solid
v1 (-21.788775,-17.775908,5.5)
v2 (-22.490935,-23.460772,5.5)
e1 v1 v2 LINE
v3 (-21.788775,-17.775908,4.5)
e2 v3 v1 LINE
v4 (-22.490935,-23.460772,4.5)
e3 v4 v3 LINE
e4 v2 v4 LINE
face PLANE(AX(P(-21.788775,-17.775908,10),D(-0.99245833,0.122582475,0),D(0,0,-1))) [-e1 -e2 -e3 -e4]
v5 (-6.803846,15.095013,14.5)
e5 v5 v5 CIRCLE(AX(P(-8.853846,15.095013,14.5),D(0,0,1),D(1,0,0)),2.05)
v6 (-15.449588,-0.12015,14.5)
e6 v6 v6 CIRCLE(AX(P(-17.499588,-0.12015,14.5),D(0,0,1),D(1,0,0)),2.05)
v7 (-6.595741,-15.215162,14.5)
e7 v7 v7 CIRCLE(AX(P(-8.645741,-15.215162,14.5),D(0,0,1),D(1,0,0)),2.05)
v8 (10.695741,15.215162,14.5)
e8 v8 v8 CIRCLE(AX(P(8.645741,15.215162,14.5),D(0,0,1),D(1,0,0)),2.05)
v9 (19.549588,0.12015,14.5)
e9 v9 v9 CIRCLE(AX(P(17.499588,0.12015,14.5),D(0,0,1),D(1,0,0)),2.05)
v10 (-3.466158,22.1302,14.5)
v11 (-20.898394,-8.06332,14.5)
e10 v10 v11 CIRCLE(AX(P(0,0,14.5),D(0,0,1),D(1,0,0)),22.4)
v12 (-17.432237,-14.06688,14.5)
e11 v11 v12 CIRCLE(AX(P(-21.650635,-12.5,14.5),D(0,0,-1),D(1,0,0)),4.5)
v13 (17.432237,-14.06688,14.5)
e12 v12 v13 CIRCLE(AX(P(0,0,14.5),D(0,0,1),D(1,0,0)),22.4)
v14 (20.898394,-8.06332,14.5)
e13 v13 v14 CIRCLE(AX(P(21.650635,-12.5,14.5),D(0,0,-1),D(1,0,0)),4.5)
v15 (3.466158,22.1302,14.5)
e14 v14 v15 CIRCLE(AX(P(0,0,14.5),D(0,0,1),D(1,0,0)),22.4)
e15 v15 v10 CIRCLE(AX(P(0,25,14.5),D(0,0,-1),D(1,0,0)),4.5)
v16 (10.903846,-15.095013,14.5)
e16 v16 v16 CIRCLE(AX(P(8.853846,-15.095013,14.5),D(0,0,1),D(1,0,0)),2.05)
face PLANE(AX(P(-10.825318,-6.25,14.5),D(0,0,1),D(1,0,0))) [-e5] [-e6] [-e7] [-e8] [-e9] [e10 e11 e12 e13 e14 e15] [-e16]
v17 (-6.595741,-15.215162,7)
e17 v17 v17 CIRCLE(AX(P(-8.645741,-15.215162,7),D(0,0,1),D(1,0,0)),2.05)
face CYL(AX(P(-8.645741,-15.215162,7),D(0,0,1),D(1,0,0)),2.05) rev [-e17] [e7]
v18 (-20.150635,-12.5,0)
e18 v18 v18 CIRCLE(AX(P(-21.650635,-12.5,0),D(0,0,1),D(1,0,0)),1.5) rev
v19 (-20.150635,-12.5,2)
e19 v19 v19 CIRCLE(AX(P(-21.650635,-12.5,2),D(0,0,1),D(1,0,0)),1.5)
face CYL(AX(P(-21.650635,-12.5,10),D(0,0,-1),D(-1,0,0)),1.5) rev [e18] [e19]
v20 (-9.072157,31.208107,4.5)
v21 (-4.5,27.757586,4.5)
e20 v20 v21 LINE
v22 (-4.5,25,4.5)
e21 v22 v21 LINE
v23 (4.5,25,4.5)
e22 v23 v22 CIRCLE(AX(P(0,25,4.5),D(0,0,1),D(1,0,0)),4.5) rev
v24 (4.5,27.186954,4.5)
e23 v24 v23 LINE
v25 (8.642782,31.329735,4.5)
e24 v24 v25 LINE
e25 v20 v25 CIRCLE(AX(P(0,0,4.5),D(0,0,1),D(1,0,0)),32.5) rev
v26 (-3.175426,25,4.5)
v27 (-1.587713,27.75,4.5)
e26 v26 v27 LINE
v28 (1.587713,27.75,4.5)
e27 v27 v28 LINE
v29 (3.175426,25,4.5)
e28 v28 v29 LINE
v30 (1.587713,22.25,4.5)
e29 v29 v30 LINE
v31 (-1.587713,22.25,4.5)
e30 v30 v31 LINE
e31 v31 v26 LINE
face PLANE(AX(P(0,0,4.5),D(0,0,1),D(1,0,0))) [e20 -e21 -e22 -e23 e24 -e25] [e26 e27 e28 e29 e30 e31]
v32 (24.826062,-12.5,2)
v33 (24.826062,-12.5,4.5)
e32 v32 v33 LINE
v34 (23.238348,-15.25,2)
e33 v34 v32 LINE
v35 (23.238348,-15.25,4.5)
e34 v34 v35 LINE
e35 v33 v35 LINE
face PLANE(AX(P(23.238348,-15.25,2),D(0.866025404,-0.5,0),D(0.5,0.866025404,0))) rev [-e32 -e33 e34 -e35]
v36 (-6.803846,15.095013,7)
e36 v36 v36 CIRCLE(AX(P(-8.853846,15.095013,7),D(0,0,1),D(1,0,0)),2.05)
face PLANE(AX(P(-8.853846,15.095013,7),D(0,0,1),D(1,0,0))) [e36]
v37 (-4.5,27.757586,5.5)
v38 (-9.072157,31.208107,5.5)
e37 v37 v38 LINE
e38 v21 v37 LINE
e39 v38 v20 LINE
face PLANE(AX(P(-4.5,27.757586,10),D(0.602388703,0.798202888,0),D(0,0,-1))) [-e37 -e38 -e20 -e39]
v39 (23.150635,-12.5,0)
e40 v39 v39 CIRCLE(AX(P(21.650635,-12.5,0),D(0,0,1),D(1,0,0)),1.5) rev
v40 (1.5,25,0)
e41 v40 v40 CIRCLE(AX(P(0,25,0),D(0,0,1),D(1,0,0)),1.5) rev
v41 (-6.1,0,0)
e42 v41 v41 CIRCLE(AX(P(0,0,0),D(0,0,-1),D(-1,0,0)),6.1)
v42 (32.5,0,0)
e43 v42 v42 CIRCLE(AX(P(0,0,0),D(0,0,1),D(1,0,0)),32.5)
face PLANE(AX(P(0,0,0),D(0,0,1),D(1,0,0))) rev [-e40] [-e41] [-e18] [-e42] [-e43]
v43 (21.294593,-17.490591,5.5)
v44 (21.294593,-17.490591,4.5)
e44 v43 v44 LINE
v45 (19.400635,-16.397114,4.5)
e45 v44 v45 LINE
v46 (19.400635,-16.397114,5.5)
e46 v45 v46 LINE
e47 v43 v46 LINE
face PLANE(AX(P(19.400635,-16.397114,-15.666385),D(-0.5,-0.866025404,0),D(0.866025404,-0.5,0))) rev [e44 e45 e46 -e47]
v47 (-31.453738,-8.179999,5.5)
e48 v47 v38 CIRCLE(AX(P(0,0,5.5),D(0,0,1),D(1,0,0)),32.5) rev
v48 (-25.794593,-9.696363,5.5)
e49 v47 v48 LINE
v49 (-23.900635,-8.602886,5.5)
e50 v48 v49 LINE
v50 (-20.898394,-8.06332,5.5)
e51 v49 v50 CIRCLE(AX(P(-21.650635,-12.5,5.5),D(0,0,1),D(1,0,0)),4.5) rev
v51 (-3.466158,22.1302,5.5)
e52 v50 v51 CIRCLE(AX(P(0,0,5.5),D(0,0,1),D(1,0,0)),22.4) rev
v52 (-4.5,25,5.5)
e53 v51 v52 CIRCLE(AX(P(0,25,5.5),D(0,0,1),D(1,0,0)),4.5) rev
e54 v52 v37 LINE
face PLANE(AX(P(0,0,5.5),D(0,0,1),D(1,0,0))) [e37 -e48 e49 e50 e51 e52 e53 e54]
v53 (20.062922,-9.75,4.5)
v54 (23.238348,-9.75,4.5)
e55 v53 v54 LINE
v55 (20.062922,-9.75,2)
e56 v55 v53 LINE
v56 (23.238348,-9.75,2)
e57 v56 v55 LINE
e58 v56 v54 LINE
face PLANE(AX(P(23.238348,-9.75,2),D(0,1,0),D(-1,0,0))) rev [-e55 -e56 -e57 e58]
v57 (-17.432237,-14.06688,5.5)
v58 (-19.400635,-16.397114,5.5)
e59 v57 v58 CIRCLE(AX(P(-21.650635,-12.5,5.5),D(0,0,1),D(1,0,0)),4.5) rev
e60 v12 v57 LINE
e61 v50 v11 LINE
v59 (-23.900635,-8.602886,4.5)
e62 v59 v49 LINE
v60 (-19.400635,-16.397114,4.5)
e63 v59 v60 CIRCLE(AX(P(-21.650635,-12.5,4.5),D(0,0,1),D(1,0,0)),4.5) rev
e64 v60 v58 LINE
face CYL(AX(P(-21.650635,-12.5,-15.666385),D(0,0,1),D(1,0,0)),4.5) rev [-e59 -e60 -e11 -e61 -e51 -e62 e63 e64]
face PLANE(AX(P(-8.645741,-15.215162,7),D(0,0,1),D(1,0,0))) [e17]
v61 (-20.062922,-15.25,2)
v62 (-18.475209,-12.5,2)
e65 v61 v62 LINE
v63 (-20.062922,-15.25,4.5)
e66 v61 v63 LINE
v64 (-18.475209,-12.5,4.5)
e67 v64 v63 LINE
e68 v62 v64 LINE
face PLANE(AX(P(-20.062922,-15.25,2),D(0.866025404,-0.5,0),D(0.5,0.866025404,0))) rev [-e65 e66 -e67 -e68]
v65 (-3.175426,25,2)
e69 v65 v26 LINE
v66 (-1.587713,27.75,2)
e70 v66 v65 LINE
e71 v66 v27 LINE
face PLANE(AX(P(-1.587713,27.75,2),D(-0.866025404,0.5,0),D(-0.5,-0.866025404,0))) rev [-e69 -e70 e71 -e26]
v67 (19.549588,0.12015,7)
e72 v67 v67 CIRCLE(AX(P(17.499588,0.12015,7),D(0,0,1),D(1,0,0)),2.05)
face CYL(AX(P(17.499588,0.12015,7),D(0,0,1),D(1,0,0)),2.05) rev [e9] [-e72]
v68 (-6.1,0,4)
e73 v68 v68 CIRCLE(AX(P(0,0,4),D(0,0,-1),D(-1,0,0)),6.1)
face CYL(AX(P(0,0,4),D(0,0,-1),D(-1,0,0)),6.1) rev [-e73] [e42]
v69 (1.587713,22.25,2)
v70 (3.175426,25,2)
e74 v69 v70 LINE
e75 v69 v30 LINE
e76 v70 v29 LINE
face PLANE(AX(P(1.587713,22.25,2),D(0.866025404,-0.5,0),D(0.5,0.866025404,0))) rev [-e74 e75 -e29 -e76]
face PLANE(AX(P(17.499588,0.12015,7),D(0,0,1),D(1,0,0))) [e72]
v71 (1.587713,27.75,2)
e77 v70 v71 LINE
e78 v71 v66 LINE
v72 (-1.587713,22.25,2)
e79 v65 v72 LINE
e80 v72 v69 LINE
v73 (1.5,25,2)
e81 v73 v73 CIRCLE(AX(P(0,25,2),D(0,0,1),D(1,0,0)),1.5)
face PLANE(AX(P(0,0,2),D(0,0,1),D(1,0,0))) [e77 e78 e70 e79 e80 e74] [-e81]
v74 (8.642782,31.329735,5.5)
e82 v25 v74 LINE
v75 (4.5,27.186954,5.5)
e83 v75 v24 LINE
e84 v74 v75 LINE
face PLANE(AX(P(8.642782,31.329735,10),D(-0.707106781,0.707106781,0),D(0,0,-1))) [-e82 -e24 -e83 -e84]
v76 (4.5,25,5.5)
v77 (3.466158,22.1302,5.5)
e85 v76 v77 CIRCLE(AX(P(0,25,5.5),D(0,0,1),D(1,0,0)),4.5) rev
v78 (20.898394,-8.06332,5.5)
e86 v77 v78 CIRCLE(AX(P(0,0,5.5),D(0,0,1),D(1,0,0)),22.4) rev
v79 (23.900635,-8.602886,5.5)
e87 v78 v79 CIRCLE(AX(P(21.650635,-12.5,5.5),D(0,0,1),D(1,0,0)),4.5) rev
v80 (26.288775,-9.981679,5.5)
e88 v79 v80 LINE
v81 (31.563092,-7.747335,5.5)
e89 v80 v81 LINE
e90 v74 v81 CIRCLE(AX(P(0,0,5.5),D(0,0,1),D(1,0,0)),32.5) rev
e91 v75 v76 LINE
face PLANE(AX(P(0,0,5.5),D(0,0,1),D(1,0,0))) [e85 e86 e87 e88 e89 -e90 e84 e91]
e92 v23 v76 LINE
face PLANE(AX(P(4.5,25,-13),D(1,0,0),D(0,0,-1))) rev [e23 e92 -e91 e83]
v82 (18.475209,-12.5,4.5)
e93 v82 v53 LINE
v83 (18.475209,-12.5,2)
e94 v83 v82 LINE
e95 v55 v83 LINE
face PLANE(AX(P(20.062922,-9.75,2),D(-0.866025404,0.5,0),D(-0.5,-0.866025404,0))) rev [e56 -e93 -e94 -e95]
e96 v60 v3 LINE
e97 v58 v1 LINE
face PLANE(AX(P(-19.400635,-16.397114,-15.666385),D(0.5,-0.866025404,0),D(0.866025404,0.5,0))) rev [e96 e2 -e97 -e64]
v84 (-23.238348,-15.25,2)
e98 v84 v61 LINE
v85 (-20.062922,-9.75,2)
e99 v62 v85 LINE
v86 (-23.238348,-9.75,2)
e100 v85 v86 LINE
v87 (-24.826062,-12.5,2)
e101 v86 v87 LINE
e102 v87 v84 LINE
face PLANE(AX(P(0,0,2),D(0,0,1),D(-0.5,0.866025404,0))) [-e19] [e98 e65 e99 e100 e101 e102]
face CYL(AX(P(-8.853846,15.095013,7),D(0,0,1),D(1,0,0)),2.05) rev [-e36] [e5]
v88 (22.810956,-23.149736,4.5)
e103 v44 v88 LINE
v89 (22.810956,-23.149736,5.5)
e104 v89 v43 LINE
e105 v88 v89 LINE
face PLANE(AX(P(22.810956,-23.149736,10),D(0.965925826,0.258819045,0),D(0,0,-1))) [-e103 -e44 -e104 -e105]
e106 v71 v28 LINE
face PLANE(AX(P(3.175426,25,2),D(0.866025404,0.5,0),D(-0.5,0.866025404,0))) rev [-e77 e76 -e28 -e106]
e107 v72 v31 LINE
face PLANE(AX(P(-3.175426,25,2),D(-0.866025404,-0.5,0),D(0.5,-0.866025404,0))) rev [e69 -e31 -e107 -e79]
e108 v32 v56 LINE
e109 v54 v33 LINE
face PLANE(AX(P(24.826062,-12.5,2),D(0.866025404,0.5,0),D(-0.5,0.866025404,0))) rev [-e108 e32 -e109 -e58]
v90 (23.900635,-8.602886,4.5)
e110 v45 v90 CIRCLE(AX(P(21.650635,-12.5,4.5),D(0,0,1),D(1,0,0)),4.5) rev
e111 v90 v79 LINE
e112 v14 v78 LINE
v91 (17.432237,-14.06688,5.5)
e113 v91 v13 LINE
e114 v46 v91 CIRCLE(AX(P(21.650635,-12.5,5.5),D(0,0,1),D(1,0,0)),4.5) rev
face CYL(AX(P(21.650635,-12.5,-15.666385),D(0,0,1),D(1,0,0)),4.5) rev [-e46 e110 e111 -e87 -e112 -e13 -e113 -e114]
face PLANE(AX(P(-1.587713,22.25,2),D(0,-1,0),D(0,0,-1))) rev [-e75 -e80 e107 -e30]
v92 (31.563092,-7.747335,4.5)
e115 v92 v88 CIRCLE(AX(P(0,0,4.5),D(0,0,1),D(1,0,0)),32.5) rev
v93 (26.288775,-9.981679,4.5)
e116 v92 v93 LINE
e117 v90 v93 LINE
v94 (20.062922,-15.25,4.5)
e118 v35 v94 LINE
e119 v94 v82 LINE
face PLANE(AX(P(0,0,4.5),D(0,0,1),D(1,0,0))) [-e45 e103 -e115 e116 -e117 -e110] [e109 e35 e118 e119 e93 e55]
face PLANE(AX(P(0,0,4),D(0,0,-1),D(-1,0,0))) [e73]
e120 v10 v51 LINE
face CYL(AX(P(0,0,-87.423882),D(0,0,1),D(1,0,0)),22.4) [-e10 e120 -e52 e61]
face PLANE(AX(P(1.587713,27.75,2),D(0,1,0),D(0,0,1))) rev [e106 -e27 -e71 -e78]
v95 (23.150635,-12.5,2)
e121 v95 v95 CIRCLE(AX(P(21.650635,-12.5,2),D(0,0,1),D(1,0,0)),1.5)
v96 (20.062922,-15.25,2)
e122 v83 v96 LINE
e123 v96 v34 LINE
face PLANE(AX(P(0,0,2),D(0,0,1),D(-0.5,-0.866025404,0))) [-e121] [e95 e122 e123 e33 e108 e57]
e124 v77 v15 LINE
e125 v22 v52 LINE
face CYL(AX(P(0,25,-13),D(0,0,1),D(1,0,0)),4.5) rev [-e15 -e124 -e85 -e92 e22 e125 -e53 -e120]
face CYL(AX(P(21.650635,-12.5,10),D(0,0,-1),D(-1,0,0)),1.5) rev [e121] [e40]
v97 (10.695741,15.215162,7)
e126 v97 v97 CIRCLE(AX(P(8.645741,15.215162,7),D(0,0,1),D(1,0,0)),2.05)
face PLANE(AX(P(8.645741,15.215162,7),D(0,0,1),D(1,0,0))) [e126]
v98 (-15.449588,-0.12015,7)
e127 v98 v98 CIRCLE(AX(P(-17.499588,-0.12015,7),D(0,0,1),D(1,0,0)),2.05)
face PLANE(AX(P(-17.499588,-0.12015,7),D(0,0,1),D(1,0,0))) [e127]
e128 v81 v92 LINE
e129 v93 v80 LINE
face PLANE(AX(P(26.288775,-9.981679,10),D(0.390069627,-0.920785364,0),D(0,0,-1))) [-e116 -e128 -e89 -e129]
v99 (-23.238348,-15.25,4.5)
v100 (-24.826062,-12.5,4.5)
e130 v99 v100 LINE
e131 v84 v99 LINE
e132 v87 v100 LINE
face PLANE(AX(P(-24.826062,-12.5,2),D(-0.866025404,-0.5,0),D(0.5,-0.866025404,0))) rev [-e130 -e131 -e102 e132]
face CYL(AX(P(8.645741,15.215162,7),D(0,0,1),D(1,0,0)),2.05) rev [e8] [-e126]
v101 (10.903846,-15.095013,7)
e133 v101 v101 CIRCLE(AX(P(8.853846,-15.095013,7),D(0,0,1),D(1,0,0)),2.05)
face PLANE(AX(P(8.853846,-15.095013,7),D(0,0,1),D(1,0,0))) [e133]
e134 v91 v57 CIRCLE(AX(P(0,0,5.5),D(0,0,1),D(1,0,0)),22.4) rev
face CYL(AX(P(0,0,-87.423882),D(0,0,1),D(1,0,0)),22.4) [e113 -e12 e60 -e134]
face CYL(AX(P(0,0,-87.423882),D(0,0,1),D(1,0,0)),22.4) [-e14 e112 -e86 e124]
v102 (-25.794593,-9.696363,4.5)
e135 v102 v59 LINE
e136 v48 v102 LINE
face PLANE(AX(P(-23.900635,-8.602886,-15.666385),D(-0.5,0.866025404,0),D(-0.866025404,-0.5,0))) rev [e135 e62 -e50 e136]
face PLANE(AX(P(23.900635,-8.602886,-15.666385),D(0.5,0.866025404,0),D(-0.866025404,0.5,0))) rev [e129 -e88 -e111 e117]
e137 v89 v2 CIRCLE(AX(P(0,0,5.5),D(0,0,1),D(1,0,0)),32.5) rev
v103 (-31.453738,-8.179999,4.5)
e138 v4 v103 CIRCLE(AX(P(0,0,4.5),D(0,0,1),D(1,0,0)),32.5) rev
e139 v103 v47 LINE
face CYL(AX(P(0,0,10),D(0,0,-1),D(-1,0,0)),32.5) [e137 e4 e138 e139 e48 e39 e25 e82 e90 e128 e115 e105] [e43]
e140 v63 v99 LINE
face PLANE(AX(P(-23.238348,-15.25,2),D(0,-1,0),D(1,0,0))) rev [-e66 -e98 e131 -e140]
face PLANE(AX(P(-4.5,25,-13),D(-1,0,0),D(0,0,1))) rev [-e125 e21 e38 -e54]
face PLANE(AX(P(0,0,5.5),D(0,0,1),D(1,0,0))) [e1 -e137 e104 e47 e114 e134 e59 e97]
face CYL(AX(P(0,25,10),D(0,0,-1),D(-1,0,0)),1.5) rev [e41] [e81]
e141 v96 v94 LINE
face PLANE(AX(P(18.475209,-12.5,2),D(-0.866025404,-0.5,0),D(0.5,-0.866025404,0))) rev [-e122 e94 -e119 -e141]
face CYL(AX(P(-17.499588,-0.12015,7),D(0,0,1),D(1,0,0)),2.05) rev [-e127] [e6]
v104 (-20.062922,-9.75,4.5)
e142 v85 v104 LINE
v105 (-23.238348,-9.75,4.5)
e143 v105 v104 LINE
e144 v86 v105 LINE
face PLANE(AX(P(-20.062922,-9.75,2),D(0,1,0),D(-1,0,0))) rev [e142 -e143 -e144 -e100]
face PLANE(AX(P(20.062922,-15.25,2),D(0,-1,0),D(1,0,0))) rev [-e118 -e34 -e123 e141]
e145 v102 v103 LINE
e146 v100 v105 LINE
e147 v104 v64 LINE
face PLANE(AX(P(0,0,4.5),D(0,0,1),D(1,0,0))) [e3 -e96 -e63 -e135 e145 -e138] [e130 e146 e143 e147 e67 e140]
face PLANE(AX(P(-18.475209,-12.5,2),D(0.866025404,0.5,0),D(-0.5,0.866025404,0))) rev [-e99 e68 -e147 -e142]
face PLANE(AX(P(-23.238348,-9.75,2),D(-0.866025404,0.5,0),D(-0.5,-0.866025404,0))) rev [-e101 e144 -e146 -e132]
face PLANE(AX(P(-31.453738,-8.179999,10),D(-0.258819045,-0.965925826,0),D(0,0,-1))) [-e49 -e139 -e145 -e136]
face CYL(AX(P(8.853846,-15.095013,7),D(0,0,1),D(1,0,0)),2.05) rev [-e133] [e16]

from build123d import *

# Parameters (mm, degrees)
SKETCH2_R           = 32.5
BOSS_EXTRUDE1_DEPTH = 10
SKETCH3_R           = 1.5
CUT_EXTRUDE2_DEPTH  = 48.037219306
CUT_EXTRUDE3_DEPTH  = 8
CUT_EXTRUDE5_START  = -5.5
CUT_EXTRUDE5_DEPTH  = 5.5
CIRPATTERN1_COUNT   = 3
CUT_EXTRUDE8_START  = -4.5
SKETCH8_R           = 22.4
CUT_EXTRUDE8_DEPTH  = 4.5
CHAMFER1_SIZE       = 4.429367468
CHAMFER1_SIZE_2     = 5
SKETCH7_R           = 6.1
CUT_EXTRUDE7_DEPTH  = 4
BOSS_EXTRUDE2_DEPTH = 4.5
SKETCH10_R          = 2.05
CUT_EXTRUDE9_DEPTH  = 7.5


with BuildPart() as part:
    # Sketch2 → Boss-Extrude1 (new body)
    with BuildSketch(Plane.XY):
        Circle(SKETCH2_R)
    extrude(amount=BOSS_EXTRUDE1_DEPTH)

    # Sketch3 → Cut-Extrude2 (cut, symmetric)
    with BuildSketch(Plane.XY):
        with Locations((0, 25)):
            Circle(SKETCH3_R)
    cut_extrude2 = extrude(amount=CUT_EXTRUDE2_DEPTH, both=True, mode=Mode.SUBTRACT)

    # Sketch4 → Cut-Extrude3 (cut)
    with BuildSketch(Plane.XY.offset(10)):
        Polygon((1.58771324, 22.25), (3.175426481, 25), (1.58771324, 27.75), (-1.58771324, 27.75), (-3.175426481, 25), (-1.58771324, 22.25), align=None)
    cut_extrude3 = extrude(amount=-CUT_EXTRUDE3_DEPTH, mode=Mode.SUBTRACT)

    # Sketch5 → Cut-Extrude5 (cut)
    with BuildSketch(Plane.XY.offset(10).offset(CUT_EXTRUDE5_START)):
        with BuildLine():
            Line((4.5, 25), (4.5, 32.186953879))
            ThreePointArc((4.5, 32.186953879), (0, 32.5), (-4.5, 32.186953879))
            Line((-4.5, 32.186953879), (-4.5, 25))
            ThreePointArc((-4.5, 25), (0, 20.5), (4.5, 25))
        make_face()
    cut_extrude5 = extrude(amount=CUT_EXTRUDE5_DEPTH, mode=Mode.SUBTRACT)

    # CirPattern1: Cut-Extrude2, Cut-Extrude3, Cut-Extrude5 ×3 about axis
    cirpattern1_axis = Axis((0, 0, 0), (0, 0, 1))
    add([cut_extrude2.rotate(cirpattern1_axis, i * 360 / CIRPATTERN1_COUNT) for i in range(1, CIRPATTERN1_COUNT)], mode=Mode.SUBTRACT)
    add([cut_extrude3.rotate(cirpattern1_axis, i * 360 / CIRPATTERN1_COUNT) for i in range(1, CIRPATTERN1_COUNT)], mode=Mode.SUBTRACT)
    add([cut_extrude5.rotate(cirpattern1_axis, i * 360 / CIRPATTERN1_COUNT) for i in range(1, CIRPATTERN1_COUNT)], mode=Mode.SUBTRACT)

    # Sketch8 → Cut-Extrude8 (cut)
    with BuildSketch(Plane.XY.offset(10).offset(CUT_EXTRUDE8_START)):
        with BuildLine():
            ThreePointArc((-30.12471973, -12.196362622), (-28.145825623, -16.25), (-25.62471973, -19.990591256))
            ThreePointArc((-25.62471973, -19.990591256), (0, -32.5), (25.62471973, -19.990591256))
            ThreePointArc((25.62471973, -19.990591256), (28.145825623, -16.25), (30.12471973, -12.196362622))
            ThreePointArc((30.12471973, -12.196362622), (28.145825623, 16.25), (4.5, 32.186953879))
            ThreePointArc((4.5, 32.186953879), (0, 32.5), (-4.5, 32.186953879))
            ThreePointArc((-4.5, 32.186953879), (-28.145825623, 16.25), (-30.12471973, -12.196362622))
        make_face()
        Circle(SKETCH8_R, mode=Mode.SUBTRACT)
    extrude(amount=CUT_EXTRUDE8_DEPTH, mode=Mode.SUBTRACT)

    # Chamfer1
    # the kernel refuses this chamfer: 5, 4.429367468 mm, written as the material it takes off along each edge
    with BuildSketch(Plane(origin=(-25.62471973, -19.990591256, 4.5), x_dir=(0.6702188271711587, -0.7421635424253312, 0), z_dir=(0, 0, 1)), Plane(origin=(30.12471973, -12.196362622, 4.5), x_dir=(0.3076230679174066, 0.9515083016375017, 0), z_dir=(0, 0, 1)), Plane(origin=(-4.5, 32.186953879, 4.5), x_dir=(-0.977841895088566, -0.2093447592121711, 0), z_dir=(0, 0, 1))) as chamfer1_piece_1:
        with BuildLine():
            Line((4.675763163, 0), (CHAMFER1_SIZE * 0.209344759198, CHAMFER1_SIZE * 0.977841895022))
            Line((CHAMFER1_SIZE * 0.209344759198, CHAMFER1_SIZE * 0.977841895022), (0, 0))
            ThreePointArc((0, 0), (2.403339666, -0.084130686), (4.675763163, 0))
        make_face()
    extrude(amount=13.02255857, mode=Mode.SUBTRACT)
    with BuildSketch(Plane(origin=(-30.12471973, -12.196362622, 4.5), x_dir=(-0.3141485775889788, 0.9493738311112337, 0), z_dir=(0, 0, 1)), Plane(origin=(25.62471973, -19.990591256, 4.5), x_dir=(-0.6651075666359972, -0.7467475643104184, 0), z_dir=(0, 0, 1)), Plane(origin=(4.5, 32.186953879, 4.5), x_dir=(0.9792561442249751, -0.20262626680081466, 0), z_dir=(0, 0, 1))) as chamfer1_piece_2:
        with BuildLine():
            Line((4.23053931, 0), (CHAMFER1_SIZE_2 * 0.202626266801, -CHAMFER1_SIZE_2 * 0.979256144225))
            Line((CHAMFER1_SIZE_2 * 0.202626266801, -CHAMFER1_SIZE_2 * 0.979256144225), (0, 0))
            ThreePointArc((0, 0), (2.170160838, 0.068863095), (4.23053931, 0))
        make_face()
    extrude(amount=13.85841494, mode=Mode.SUBTRACT)

    # Sketch7 → Cut-Extrude7 (cut)
    with BuildSketch(Plane(origin=(0, 0, 0), x_dir=(-1, 0, 0), z_dir=(0, 0, -1))):
        Circle(SKETCH7_R)
    extrude(amount=-CUT_EXTRUDE7_DEPTH, mode=Mode.SUBTRACT)

    # Sketch9 → Boss-Extrude2 (add)
    with BuildSketch(Plane.XY.offset(10)):
        with BuildLine():
            ThreePointArc((-3.466157521, 22.1302), (0, 20.5), (3.466157521, 22.1302))
            ThreePointArc((3.466157521, 22.1302), (19.398969045, 11.2), (20.898394151, -8.063319533))
            ThreePointArc((20.898394151, -8.063319533), (17.753520778, -10.25), (17.43223663, -14.066880467))
            ThreePointArc((17.43223663, -14.066880467), (0, -22.4), (-17.43223663, -14.066880467))
            ThreePointArc((-17.43223663, -14.066880467), (-17.753520778, -10.25), (-20.898394151, -8.063319533))
            ThreePointArc((-20.898394151, -8.063319533), (-19.398969045, 11.2), (-3.466157521, 22.1302))
        make_face()
    extrude(amount=BOSS_EXTRUDE2_DEPTH)

    # Sketch10 → Cut-Extrude9 (cut)
    with BuildSketch(Plane.XY.offset(14.5)):
        with Locations((-8.645741201, -15.215162144)):
            Circle(SKETCH10_R)
        with Locations((-17.49958754, -0.120149557)):
            Circle(SKETCH10_R)
        with Locations((-8.853846339, 15.095012587)):
            Circle(SKETCH10_R)
        with Locations((8.645741201, 15.215162144)):
            Circle(SKETCH10_R)
        with Locations((17.49958754, 0.120149557)):
            Circle(SKETCH10_R)
        with Locations((8.853846339, -15.095012587)):
            Circle(SKETCH10_R)
    extrude(amount=-CUT_EXTRUDE9_DEPTH, mode=Mode.SUBTRACT)


solid = part.part
